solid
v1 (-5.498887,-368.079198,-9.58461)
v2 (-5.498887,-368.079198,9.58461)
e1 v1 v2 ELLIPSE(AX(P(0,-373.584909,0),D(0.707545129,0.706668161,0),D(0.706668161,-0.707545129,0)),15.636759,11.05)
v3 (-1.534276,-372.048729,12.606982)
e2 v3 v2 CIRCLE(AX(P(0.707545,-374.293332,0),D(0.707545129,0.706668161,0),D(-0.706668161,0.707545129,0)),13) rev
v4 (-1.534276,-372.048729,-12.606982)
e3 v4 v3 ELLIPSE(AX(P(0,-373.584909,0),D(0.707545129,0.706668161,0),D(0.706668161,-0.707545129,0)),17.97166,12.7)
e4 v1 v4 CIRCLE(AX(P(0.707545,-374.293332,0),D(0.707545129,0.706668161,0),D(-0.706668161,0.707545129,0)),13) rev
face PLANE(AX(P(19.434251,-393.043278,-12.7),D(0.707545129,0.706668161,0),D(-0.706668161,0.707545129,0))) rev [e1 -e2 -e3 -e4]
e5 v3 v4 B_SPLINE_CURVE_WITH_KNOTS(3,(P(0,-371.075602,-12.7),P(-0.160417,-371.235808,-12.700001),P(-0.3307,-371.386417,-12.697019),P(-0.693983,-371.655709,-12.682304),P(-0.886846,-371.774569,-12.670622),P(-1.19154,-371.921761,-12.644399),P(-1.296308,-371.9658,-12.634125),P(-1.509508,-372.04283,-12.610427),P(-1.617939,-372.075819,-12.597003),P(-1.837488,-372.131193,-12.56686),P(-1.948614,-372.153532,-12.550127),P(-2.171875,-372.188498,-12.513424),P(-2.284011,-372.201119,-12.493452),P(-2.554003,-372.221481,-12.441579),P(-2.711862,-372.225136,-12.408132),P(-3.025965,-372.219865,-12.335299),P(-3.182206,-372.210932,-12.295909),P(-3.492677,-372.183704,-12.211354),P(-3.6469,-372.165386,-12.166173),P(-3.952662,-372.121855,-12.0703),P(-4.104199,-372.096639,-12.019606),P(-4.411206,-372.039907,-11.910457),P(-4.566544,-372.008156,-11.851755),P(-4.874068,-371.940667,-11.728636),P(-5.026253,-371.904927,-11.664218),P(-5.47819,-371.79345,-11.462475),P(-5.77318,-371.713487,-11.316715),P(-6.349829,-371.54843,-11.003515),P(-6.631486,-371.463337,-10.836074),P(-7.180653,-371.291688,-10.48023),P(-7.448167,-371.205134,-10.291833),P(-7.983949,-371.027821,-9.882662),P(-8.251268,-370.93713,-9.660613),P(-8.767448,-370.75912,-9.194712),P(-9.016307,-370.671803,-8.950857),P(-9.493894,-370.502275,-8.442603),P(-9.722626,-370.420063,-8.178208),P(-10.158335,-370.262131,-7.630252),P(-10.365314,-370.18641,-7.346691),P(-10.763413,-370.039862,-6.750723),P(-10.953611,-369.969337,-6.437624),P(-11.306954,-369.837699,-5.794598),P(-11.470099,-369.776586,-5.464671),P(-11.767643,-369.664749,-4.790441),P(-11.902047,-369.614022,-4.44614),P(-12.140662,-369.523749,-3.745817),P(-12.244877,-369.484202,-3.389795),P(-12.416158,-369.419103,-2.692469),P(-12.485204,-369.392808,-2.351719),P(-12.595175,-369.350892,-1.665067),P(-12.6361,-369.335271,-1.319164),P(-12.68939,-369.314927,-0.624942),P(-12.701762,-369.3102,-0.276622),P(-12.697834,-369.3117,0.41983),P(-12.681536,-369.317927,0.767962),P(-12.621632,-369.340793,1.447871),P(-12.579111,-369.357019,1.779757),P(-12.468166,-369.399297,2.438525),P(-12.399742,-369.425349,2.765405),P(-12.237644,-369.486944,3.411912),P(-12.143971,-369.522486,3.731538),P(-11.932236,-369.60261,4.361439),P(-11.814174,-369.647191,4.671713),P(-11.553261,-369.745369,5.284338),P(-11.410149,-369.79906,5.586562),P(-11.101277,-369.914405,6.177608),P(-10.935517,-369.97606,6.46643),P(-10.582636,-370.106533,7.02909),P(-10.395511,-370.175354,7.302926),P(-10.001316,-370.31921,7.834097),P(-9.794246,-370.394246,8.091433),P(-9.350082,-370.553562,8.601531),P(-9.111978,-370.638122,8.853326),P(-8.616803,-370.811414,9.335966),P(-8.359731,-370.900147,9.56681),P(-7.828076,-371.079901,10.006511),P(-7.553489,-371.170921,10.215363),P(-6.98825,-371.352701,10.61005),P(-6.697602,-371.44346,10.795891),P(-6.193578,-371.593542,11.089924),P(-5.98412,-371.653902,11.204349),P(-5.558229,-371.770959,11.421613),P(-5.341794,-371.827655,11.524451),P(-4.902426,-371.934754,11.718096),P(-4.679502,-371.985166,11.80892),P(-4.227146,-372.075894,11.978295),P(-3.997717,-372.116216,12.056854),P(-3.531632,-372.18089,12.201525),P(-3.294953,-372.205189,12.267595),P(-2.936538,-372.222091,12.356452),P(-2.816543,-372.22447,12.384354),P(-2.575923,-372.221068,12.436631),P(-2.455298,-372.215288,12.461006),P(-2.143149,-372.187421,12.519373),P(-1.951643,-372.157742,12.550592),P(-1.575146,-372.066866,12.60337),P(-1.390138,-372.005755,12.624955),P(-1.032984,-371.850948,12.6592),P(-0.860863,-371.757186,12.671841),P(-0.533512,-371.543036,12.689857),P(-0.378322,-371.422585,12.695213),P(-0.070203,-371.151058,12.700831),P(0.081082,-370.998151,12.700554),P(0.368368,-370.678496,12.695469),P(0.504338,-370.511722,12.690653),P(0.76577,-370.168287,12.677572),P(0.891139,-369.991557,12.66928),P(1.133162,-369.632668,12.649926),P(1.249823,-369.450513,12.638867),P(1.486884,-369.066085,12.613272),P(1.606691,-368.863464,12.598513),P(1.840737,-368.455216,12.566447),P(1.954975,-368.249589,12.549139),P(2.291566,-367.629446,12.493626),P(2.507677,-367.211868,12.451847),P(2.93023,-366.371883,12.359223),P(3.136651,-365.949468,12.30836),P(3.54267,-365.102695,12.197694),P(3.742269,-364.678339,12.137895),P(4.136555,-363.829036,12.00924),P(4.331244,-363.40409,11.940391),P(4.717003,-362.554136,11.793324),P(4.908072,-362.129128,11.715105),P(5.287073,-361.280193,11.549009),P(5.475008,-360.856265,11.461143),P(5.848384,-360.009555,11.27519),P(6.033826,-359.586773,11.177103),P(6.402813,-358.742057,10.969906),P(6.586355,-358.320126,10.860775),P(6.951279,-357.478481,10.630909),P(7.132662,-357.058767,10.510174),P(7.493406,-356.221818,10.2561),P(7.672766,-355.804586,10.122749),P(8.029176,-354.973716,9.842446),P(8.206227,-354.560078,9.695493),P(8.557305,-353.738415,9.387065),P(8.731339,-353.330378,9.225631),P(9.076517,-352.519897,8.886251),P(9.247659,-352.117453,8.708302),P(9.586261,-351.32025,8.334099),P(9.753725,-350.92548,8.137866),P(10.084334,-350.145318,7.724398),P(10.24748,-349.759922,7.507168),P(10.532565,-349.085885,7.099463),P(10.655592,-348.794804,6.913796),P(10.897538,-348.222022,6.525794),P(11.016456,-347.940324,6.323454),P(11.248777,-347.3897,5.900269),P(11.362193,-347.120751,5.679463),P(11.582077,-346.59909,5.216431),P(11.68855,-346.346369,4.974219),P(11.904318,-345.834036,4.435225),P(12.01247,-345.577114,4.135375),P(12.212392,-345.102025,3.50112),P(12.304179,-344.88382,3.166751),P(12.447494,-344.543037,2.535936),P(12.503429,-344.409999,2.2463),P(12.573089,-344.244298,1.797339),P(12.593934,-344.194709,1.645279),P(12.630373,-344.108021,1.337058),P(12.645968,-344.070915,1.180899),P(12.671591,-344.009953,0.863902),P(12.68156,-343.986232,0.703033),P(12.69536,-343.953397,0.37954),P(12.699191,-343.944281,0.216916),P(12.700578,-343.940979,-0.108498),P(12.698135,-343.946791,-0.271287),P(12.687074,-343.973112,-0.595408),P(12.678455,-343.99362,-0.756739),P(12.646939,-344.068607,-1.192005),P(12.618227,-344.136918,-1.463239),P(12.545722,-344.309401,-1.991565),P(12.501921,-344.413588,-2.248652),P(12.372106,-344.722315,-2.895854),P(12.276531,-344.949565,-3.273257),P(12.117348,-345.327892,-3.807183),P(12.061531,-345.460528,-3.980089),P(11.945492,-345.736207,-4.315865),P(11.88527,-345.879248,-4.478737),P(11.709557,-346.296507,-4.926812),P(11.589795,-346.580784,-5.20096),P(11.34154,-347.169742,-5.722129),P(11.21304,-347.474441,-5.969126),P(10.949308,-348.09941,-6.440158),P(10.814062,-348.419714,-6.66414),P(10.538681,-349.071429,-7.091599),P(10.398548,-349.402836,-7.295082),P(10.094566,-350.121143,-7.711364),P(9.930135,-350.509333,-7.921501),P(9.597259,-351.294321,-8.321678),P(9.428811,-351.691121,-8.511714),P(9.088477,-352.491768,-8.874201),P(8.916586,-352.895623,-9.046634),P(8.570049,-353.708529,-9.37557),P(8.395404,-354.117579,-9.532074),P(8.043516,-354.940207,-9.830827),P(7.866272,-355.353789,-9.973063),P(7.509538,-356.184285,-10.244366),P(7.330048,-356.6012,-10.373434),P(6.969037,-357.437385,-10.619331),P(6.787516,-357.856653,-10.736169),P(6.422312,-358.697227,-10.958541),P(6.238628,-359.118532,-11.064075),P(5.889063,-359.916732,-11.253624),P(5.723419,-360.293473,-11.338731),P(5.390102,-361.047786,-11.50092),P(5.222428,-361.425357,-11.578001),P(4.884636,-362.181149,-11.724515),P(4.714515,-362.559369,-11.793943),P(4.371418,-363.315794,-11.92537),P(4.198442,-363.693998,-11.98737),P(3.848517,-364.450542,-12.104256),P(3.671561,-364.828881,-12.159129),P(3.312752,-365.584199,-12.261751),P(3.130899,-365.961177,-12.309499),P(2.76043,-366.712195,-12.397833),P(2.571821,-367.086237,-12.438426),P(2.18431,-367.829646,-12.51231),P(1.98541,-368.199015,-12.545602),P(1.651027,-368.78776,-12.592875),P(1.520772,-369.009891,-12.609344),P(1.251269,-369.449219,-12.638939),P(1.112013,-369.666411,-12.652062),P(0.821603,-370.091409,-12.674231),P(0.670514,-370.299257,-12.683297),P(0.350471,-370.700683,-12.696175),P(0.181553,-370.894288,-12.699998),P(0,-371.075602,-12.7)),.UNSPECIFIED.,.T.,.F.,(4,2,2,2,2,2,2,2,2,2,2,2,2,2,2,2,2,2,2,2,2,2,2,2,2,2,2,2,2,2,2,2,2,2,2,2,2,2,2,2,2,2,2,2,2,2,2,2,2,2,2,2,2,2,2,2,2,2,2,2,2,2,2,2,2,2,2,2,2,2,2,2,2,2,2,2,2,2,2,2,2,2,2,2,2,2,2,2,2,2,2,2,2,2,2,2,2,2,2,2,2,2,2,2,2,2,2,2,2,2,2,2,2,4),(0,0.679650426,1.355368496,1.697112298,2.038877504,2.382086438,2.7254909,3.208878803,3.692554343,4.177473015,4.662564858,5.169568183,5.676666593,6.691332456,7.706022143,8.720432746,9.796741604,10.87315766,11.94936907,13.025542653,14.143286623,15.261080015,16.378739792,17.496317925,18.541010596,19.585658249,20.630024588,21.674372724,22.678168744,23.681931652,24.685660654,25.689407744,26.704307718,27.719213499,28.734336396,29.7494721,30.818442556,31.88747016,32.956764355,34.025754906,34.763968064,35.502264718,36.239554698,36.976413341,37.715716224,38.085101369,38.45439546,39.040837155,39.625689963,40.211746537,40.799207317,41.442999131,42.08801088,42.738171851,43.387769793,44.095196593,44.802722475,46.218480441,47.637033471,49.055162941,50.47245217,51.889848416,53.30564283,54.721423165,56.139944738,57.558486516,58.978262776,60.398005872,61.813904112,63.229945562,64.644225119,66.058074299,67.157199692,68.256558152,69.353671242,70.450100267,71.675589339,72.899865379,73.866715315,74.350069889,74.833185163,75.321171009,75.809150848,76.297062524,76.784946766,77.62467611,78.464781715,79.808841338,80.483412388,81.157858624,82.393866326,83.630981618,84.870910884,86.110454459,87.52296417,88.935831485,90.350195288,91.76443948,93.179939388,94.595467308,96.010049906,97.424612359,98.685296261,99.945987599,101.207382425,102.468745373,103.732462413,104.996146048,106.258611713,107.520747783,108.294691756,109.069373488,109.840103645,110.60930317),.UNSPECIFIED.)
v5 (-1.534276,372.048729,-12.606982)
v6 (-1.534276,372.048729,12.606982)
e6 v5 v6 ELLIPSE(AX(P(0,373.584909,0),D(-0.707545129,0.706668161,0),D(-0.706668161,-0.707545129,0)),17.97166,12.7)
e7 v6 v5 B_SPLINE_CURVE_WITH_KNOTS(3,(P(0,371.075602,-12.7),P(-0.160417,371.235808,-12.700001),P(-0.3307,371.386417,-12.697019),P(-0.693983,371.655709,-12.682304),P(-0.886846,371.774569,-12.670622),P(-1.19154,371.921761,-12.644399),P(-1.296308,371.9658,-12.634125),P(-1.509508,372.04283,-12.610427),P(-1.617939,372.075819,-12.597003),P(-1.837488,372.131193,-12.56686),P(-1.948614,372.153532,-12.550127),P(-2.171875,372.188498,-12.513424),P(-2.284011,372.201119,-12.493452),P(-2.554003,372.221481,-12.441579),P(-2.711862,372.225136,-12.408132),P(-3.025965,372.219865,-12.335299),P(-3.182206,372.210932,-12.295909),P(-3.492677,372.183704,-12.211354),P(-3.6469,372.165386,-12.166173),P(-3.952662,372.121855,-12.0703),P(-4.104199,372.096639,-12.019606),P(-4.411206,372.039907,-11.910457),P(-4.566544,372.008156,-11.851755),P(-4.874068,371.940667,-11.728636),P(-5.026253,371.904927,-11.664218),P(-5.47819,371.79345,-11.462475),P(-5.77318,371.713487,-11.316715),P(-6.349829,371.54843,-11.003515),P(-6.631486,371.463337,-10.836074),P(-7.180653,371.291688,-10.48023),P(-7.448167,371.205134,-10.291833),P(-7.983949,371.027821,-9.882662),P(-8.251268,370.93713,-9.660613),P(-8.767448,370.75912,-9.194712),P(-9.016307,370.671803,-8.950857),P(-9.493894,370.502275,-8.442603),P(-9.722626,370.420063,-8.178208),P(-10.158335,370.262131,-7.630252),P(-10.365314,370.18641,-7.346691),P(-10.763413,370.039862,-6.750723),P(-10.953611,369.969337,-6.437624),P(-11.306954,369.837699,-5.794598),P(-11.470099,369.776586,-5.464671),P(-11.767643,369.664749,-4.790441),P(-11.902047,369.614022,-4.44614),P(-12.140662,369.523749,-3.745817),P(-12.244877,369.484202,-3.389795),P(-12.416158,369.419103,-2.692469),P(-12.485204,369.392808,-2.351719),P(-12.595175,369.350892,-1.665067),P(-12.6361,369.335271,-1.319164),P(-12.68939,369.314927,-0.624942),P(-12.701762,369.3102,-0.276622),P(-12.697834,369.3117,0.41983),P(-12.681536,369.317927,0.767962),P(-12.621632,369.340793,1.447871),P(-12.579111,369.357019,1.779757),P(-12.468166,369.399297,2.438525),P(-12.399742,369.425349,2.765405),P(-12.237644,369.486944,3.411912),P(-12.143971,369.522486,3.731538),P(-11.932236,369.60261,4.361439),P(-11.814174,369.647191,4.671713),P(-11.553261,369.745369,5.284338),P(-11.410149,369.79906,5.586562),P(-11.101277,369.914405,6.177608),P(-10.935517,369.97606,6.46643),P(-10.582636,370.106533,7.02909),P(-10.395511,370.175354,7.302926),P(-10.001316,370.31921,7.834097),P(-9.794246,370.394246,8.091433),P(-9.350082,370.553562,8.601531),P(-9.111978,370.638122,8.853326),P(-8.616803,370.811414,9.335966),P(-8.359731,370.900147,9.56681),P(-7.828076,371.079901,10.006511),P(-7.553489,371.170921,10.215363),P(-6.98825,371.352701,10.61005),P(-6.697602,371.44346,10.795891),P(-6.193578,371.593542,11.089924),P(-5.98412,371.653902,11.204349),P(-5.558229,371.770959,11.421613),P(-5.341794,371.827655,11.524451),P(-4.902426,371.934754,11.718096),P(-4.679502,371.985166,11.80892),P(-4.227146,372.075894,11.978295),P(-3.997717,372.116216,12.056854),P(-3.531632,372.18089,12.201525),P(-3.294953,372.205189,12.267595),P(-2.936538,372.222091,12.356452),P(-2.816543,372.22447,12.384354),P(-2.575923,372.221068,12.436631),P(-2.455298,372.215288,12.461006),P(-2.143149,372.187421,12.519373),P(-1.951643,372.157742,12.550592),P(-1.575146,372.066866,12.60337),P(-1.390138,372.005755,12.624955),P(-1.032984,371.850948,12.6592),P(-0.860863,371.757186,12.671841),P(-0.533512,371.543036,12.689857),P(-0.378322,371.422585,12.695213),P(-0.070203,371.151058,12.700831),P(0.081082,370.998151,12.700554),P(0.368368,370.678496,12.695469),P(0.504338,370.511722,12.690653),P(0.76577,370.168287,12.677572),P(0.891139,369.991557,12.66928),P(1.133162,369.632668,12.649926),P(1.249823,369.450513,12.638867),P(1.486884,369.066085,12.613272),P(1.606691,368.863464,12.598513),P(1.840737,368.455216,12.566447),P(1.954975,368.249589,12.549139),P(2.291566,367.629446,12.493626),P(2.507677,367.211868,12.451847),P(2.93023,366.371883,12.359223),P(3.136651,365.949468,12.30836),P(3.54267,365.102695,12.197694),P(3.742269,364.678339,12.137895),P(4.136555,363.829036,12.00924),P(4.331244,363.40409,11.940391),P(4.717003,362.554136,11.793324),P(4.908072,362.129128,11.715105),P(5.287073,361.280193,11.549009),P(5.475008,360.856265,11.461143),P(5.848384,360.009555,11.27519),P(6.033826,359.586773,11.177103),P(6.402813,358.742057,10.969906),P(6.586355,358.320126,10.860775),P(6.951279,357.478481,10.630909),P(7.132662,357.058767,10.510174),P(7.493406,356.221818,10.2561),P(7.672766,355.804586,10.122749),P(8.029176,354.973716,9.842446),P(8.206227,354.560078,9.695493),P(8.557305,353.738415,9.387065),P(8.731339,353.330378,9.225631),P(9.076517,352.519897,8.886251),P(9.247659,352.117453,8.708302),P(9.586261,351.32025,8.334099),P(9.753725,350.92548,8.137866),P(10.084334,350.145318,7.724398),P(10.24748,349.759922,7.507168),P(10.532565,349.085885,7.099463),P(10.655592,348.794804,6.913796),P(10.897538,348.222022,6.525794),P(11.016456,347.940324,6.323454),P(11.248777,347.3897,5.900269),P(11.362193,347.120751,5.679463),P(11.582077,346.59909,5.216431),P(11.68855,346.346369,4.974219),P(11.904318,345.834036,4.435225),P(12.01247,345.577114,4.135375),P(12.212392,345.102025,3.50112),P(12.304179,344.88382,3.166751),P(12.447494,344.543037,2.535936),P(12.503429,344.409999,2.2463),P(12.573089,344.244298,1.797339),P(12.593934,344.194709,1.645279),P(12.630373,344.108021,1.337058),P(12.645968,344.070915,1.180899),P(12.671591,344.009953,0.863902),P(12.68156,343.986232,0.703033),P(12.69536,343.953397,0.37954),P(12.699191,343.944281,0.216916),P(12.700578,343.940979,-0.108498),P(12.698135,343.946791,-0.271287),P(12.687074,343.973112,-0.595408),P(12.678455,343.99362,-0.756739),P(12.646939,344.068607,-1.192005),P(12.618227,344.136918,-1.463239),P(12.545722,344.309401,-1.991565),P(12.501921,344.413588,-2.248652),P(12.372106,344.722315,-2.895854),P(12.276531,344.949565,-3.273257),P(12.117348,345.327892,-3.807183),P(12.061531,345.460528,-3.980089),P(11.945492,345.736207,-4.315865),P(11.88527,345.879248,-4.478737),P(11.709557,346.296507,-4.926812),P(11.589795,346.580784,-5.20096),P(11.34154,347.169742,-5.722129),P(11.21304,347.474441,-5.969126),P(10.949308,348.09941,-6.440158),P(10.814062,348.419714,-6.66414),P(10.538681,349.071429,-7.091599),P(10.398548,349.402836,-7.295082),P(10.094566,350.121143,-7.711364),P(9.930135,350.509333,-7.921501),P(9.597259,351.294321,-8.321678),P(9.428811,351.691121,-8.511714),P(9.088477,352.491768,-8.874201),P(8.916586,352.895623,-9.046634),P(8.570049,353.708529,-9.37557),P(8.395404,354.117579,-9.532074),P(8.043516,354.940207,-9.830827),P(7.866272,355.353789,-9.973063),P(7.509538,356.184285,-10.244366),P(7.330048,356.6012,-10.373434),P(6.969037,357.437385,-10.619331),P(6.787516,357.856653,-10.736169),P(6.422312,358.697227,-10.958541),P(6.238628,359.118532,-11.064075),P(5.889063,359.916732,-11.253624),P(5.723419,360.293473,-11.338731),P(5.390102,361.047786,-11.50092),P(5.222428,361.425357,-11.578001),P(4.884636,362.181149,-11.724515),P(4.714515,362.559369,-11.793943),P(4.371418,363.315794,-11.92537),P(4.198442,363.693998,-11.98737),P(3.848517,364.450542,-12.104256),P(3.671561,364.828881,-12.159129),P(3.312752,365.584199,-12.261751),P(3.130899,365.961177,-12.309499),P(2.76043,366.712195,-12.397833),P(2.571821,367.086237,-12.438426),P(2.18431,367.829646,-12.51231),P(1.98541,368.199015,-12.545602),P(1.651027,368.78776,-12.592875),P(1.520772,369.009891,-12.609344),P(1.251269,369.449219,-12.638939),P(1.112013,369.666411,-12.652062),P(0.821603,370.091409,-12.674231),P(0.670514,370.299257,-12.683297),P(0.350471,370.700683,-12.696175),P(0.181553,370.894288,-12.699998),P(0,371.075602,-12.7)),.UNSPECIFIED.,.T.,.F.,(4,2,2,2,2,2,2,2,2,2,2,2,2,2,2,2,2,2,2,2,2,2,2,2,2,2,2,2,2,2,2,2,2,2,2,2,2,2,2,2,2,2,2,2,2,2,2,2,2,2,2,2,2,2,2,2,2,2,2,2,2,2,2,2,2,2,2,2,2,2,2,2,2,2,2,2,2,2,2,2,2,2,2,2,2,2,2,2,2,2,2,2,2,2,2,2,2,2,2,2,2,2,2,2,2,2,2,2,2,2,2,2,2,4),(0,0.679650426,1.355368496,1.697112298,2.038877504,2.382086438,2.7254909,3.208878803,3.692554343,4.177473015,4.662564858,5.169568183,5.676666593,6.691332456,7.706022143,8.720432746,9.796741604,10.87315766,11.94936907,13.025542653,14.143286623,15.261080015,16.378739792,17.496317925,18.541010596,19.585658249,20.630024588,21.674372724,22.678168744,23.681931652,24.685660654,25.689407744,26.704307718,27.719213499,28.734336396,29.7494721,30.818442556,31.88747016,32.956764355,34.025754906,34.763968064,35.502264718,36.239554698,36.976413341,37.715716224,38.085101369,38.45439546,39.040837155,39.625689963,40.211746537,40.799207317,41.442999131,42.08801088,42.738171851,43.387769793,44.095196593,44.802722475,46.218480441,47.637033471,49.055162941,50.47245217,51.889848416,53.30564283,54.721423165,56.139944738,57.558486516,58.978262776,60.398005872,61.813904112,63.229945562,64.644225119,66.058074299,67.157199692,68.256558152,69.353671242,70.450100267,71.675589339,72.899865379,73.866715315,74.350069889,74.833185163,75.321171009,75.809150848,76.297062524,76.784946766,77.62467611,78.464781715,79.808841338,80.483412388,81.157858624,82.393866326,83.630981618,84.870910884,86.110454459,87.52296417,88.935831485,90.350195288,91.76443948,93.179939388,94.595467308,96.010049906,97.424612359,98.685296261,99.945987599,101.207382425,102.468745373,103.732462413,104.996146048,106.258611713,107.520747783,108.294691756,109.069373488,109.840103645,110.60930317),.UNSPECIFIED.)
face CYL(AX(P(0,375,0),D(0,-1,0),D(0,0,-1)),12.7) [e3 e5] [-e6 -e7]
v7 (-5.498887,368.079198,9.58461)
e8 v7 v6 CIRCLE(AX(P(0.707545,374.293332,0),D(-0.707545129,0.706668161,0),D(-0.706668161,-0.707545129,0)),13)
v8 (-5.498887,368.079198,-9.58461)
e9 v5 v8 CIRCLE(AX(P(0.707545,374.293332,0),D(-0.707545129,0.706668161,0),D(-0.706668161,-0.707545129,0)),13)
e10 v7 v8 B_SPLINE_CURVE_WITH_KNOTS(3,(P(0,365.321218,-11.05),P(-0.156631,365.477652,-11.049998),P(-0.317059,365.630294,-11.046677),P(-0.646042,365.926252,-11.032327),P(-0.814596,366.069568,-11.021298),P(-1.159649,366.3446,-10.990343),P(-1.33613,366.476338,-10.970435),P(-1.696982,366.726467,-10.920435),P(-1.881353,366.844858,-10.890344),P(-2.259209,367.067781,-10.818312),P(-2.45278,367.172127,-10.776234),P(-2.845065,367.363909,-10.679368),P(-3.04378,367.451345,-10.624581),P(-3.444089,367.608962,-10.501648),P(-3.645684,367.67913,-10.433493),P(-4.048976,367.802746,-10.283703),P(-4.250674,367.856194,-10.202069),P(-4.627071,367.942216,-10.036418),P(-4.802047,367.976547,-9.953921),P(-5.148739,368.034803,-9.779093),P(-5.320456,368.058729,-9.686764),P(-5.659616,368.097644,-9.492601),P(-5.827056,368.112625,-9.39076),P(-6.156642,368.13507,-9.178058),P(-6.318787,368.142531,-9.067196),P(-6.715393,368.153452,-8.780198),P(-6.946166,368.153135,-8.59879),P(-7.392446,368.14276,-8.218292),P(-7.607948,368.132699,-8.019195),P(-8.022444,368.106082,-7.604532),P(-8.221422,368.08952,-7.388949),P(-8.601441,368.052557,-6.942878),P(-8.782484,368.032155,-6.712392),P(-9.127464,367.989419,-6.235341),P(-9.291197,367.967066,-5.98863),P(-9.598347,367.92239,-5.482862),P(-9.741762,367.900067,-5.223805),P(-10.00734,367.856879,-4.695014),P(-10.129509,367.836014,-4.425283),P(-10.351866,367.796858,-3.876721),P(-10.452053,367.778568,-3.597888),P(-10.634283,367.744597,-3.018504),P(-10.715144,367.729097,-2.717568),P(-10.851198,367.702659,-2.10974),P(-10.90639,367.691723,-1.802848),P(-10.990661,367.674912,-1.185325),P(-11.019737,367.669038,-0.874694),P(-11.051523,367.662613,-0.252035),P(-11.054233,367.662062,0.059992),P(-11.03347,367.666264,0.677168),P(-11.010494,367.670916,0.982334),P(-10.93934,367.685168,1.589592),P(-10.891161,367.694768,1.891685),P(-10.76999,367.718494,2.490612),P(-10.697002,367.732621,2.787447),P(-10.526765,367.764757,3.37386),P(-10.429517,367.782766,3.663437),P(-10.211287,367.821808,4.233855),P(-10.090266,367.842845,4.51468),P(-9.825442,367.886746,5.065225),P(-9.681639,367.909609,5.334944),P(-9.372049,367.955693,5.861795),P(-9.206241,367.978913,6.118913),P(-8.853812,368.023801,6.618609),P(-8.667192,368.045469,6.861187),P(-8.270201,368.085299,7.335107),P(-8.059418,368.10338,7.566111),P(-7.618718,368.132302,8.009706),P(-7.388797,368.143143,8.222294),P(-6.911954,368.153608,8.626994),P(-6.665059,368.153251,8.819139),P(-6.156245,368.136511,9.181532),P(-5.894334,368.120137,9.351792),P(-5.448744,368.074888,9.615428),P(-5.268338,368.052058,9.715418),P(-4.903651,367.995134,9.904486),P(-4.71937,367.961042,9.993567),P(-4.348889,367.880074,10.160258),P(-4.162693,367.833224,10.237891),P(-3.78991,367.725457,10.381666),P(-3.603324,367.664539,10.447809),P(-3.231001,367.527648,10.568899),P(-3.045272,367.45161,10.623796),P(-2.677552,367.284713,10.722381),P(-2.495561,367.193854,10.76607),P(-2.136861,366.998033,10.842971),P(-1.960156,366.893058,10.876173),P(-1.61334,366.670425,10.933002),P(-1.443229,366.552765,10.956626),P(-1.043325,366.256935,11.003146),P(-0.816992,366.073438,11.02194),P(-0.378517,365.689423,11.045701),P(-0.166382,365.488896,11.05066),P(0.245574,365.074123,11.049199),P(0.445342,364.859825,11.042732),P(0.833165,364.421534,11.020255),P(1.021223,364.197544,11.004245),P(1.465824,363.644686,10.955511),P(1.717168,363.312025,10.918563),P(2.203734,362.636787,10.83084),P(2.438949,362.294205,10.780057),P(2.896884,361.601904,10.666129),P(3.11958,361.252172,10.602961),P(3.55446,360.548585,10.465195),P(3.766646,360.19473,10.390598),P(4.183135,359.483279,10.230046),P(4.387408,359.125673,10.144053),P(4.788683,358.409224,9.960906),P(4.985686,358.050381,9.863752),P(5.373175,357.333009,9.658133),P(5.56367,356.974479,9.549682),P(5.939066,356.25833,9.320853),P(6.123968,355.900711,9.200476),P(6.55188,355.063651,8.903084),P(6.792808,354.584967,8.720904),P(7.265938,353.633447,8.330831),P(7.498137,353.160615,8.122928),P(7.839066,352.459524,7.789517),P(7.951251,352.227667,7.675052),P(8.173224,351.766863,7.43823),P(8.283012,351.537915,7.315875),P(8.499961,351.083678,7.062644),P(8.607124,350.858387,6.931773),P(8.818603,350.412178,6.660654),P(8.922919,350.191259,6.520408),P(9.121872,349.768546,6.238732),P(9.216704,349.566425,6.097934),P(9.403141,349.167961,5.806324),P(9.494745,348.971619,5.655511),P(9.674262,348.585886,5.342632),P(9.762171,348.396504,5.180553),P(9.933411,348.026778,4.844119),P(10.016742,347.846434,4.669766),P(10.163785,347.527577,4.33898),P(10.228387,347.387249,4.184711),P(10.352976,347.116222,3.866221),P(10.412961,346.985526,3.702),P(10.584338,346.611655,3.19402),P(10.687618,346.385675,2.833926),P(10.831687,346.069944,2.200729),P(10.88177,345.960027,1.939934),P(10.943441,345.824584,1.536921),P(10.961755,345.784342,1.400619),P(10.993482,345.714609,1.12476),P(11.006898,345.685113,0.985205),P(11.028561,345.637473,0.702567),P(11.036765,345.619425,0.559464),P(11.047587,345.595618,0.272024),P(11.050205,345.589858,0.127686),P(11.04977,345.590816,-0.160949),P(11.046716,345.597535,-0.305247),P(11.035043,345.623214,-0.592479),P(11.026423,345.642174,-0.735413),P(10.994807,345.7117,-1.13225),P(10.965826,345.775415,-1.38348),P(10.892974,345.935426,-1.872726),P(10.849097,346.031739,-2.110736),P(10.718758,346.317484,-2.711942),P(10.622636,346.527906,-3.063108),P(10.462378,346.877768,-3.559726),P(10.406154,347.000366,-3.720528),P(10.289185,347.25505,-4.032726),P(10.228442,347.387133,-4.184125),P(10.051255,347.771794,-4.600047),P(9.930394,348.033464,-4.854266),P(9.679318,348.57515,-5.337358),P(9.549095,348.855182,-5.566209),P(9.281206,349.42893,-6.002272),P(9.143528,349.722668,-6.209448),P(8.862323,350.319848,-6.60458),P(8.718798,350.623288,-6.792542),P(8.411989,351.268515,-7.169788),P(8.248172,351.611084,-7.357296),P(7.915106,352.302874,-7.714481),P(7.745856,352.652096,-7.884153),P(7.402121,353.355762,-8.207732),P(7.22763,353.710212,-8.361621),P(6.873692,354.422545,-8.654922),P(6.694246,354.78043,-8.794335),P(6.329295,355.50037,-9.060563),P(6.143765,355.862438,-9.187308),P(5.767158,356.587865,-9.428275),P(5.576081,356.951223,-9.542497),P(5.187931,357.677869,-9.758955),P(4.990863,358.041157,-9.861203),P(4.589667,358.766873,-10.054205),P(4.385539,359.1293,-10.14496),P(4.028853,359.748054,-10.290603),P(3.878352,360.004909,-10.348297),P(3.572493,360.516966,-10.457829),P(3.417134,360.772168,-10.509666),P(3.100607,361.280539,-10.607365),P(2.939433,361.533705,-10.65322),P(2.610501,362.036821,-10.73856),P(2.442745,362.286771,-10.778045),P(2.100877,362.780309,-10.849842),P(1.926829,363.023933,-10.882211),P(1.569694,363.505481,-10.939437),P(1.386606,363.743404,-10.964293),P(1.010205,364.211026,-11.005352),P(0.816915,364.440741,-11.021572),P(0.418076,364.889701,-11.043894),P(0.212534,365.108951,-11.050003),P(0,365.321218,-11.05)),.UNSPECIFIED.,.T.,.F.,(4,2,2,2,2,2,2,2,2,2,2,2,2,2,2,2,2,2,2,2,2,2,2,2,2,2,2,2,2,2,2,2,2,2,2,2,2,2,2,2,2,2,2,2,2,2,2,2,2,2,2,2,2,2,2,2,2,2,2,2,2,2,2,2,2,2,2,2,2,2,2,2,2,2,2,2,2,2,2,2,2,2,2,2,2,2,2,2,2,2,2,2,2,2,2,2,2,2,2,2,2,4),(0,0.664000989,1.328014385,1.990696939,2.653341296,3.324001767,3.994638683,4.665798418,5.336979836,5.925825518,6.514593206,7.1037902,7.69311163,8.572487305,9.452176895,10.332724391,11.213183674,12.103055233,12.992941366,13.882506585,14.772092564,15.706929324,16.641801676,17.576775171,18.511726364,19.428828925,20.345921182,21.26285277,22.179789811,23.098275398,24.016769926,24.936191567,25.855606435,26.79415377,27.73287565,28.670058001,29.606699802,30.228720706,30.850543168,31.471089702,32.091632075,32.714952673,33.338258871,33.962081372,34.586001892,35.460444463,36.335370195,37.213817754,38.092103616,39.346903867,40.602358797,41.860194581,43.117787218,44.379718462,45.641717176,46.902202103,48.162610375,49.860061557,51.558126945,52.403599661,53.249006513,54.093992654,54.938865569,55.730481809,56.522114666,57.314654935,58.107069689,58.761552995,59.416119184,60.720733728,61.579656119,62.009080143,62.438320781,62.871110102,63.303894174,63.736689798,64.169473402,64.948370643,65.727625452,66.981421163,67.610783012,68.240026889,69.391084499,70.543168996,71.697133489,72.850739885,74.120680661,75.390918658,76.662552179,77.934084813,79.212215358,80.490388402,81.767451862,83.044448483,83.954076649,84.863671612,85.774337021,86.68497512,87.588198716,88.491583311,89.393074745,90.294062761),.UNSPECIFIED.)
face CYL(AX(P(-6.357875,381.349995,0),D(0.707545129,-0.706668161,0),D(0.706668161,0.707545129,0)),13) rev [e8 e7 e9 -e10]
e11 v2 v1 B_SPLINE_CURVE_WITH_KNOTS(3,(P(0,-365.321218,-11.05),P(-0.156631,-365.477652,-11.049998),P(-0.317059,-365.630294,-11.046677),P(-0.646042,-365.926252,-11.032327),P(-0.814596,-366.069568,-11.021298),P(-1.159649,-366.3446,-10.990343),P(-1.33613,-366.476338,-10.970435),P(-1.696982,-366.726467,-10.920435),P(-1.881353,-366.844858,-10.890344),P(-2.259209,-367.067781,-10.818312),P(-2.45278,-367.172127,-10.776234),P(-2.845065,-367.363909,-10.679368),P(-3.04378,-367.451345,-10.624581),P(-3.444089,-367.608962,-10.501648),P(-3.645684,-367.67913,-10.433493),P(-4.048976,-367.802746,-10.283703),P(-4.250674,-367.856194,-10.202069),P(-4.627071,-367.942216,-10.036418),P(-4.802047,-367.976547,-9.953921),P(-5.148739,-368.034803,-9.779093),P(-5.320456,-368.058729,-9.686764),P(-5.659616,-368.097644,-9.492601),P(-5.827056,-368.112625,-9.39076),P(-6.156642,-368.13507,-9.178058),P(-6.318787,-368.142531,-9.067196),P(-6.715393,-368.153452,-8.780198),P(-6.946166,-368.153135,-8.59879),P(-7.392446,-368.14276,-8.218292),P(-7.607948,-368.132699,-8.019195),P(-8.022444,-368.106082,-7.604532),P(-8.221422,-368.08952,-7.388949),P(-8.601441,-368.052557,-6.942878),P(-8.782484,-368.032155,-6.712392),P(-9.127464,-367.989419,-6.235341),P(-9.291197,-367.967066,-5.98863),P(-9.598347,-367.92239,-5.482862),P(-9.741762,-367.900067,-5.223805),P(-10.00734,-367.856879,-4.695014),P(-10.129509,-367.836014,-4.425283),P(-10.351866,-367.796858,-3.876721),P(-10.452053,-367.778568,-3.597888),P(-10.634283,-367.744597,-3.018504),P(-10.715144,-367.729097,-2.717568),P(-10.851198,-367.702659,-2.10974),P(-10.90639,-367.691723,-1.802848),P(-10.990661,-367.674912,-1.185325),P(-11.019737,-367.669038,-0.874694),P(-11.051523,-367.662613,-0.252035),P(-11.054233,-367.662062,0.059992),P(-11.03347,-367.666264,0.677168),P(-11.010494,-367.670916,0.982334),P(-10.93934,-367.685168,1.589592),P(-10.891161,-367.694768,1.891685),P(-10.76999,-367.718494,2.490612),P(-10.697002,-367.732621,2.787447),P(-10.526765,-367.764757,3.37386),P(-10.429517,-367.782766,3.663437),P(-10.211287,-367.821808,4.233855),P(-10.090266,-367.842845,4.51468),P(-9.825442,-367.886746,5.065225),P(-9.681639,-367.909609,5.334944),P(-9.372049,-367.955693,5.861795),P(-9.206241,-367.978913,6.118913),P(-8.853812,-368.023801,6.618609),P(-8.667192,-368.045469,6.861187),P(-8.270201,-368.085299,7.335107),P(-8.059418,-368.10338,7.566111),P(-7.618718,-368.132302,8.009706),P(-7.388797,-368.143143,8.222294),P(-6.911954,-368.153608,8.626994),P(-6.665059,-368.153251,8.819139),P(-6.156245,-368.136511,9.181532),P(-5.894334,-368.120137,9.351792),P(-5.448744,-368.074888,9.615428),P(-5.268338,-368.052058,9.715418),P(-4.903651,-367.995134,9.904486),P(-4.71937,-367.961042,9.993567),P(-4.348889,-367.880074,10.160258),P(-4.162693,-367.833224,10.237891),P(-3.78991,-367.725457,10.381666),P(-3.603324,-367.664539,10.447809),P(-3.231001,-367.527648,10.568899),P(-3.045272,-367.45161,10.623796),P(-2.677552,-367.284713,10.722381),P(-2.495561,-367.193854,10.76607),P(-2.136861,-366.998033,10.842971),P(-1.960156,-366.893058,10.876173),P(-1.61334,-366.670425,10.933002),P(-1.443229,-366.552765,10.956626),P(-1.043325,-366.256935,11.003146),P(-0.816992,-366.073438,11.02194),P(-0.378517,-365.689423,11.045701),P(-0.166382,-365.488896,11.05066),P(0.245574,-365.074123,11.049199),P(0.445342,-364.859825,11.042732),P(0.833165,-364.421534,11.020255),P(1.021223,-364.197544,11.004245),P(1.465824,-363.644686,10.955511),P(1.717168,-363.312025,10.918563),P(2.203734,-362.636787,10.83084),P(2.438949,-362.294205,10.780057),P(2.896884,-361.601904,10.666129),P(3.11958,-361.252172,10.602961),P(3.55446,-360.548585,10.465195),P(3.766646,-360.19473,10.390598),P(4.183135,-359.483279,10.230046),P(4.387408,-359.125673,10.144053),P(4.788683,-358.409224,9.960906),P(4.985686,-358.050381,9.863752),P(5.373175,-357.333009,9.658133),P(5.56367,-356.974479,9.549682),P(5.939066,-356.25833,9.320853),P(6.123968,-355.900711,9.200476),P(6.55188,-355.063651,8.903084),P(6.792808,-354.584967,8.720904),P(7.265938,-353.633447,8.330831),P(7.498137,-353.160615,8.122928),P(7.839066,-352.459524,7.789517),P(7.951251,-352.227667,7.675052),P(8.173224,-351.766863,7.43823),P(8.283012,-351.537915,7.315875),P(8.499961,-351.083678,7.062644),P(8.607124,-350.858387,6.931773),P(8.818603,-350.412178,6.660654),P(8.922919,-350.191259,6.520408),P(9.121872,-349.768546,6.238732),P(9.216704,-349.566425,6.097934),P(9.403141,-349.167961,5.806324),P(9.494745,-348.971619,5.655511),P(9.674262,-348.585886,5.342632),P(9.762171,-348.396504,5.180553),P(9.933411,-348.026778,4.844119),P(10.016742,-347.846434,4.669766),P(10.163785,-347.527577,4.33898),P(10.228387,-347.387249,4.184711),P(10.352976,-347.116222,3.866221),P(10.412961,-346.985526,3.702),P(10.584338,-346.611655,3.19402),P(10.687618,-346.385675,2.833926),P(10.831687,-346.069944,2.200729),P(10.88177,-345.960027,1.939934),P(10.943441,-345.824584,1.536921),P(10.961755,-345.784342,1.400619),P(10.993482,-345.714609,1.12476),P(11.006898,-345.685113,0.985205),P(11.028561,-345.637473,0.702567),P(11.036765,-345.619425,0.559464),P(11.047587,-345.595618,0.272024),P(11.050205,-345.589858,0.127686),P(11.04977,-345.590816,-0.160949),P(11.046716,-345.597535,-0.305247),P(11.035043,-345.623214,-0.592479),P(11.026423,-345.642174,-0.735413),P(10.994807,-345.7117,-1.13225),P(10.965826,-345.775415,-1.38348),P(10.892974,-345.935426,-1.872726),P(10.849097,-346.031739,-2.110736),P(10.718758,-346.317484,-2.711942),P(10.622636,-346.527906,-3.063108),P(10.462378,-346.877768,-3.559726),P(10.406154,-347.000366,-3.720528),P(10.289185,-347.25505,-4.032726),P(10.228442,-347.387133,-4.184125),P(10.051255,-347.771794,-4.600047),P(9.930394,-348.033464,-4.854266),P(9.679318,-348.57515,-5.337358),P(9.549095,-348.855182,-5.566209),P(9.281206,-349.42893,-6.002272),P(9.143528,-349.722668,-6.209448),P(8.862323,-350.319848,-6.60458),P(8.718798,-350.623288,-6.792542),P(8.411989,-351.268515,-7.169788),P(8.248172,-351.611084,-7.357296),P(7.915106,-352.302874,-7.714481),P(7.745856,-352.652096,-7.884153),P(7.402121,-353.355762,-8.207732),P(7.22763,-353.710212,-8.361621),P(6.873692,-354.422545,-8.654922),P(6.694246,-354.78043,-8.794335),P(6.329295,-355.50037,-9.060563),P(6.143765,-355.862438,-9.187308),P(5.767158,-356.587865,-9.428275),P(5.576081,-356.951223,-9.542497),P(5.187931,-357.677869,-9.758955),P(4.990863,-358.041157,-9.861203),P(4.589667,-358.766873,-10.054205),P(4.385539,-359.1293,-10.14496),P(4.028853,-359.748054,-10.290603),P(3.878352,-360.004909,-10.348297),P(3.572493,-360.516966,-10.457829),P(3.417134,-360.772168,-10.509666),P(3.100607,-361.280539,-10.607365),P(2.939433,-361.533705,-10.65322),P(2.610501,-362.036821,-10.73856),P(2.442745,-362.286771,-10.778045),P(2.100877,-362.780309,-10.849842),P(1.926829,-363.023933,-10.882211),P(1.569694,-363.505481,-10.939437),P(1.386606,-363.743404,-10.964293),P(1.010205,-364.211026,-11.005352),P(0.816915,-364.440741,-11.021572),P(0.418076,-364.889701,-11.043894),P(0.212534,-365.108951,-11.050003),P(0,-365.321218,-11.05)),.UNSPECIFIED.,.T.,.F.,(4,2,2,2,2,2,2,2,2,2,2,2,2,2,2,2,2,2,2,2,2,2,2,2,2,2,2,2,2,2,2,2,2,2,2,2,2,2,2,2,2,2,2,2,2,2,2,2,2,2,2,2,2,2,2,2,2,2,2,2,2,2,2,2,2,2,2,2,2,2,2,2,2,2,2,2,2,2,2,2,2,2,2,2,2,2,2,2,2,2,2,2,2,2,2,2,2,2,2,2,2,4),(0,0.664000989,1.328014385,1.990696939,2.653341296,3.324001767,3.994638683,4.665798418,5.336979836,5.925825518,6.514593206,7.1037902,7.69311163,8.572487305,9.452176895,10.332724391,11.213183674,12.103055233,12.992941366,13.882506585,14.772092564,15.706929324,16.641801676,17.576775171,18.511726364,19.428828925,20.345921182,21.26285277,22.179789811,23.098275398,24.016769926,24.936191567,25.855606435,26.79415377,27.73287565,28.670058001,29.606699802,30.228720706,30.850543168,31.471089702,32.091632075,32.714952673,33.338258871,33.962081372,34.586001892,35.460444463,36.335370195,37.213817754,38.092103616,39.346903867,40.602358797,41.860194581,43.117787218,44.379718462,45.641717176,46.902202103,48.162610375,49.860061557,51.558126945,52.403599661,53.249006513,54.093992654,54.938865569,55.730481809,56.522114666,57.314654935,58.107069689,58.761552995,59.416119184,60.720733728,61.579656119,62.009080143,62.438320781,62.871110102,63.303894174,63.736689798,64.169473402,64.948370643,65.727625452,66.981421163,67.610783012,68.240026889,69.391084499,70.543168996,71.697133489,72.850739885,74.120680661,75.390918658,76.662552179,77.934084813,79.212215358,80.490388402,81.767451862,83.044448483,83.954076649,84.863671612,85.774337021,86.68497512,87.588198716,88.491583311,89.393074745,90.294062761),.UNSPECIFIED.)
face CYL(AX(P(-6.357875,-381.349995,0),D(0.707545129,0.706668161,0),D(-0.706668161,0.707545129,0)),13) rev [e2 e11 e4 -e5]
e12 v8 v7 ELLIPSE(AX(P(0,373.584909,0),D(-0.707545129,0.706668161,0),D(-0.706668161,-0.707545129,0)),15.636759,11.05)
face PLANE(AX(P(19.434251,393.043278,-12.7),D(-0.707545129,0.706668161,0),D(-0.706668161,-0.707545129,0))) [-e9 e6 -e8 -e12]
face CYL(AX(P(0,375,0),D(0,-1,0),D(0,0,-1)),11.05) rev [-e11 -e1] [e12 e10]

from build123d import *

# Parameters (mm, degrees)
SKETCH1_R           = 12.7
SKETCH1_R_2         = 11.05
BOSS_EXTRUDE1_DEPTH = 375
SKETCH2_R           = 13
CUT_EXTRUDE1_DEPTH  = 751.21502251
CUT_EXTRUDE2_START  = -12.606982135
CUT_EXTRUDE2_DEPTH  = 25.21396427


# Read off the part's stored shape, not the designer's step: Cut-Extrude2
with BuildPart() as part:
    # Sketch1 → Boss-Extrude1 (new, symmetric)
    with BuildSketch(Plane(origin=(0, 0, 0), x_dir=(1, 0, 0), z_dir=(0, 1, 0))):
        with Locations(Location((0, 0, 0), (0, 0, 270))):
            Circle(SKETCH1_R)
        with Locations(Location((0, 0, 0), (0, 0, 270))):
            Circle(SKETCH1_R_2, mode=Mode.SUBTRACT)
    extrude(amount=BOSS_EXTRUDE1_DEPTH, both=True)

    # Sketch2 → Cut-Extrude1 (cut, symmetric)
    with BuildSketch(Plane(origin=(0, -375, 0), x_dir=(0, 0, -1), z_dir=(0.707545129365096, 0.7066681610994865, 0))):
        Circle(SKETCH2_R)
    cut_extrude1 = extrude(amount=CUT_EXTRUDE1_DEPTH, both=True, mode=Mode.SUBTRACT)

    # Mirror1: Cut-Extrude1 across plane
    add(cut_extrude1.mirror(Plane.ZX), mode=Mode.SUBTRACT)

    # Cut-Extrude2 outline → Cut-Extrude2 (cut)
    with BuildSketch(Plane.XY.offset(CUT_EXTRUDE2_START)):
        Polygon((0, -373.584908653), (-1.534275545, -372.048729087), (-12.7, -360.869148077), (-14, -359.56753479), (-14, -374), (0, -374), align=None)
    cut_extrude2 = extrude(amount=CUT_EXTRUDE2_DEPTH, mode=Mode.SUBTRACT)

    # Mirror2: Cut-Extrude2 across plane
    add(cut_extrude2.mirror(Plane.ZX), mode=Mode.SUBTRACT)


solid = part.part
